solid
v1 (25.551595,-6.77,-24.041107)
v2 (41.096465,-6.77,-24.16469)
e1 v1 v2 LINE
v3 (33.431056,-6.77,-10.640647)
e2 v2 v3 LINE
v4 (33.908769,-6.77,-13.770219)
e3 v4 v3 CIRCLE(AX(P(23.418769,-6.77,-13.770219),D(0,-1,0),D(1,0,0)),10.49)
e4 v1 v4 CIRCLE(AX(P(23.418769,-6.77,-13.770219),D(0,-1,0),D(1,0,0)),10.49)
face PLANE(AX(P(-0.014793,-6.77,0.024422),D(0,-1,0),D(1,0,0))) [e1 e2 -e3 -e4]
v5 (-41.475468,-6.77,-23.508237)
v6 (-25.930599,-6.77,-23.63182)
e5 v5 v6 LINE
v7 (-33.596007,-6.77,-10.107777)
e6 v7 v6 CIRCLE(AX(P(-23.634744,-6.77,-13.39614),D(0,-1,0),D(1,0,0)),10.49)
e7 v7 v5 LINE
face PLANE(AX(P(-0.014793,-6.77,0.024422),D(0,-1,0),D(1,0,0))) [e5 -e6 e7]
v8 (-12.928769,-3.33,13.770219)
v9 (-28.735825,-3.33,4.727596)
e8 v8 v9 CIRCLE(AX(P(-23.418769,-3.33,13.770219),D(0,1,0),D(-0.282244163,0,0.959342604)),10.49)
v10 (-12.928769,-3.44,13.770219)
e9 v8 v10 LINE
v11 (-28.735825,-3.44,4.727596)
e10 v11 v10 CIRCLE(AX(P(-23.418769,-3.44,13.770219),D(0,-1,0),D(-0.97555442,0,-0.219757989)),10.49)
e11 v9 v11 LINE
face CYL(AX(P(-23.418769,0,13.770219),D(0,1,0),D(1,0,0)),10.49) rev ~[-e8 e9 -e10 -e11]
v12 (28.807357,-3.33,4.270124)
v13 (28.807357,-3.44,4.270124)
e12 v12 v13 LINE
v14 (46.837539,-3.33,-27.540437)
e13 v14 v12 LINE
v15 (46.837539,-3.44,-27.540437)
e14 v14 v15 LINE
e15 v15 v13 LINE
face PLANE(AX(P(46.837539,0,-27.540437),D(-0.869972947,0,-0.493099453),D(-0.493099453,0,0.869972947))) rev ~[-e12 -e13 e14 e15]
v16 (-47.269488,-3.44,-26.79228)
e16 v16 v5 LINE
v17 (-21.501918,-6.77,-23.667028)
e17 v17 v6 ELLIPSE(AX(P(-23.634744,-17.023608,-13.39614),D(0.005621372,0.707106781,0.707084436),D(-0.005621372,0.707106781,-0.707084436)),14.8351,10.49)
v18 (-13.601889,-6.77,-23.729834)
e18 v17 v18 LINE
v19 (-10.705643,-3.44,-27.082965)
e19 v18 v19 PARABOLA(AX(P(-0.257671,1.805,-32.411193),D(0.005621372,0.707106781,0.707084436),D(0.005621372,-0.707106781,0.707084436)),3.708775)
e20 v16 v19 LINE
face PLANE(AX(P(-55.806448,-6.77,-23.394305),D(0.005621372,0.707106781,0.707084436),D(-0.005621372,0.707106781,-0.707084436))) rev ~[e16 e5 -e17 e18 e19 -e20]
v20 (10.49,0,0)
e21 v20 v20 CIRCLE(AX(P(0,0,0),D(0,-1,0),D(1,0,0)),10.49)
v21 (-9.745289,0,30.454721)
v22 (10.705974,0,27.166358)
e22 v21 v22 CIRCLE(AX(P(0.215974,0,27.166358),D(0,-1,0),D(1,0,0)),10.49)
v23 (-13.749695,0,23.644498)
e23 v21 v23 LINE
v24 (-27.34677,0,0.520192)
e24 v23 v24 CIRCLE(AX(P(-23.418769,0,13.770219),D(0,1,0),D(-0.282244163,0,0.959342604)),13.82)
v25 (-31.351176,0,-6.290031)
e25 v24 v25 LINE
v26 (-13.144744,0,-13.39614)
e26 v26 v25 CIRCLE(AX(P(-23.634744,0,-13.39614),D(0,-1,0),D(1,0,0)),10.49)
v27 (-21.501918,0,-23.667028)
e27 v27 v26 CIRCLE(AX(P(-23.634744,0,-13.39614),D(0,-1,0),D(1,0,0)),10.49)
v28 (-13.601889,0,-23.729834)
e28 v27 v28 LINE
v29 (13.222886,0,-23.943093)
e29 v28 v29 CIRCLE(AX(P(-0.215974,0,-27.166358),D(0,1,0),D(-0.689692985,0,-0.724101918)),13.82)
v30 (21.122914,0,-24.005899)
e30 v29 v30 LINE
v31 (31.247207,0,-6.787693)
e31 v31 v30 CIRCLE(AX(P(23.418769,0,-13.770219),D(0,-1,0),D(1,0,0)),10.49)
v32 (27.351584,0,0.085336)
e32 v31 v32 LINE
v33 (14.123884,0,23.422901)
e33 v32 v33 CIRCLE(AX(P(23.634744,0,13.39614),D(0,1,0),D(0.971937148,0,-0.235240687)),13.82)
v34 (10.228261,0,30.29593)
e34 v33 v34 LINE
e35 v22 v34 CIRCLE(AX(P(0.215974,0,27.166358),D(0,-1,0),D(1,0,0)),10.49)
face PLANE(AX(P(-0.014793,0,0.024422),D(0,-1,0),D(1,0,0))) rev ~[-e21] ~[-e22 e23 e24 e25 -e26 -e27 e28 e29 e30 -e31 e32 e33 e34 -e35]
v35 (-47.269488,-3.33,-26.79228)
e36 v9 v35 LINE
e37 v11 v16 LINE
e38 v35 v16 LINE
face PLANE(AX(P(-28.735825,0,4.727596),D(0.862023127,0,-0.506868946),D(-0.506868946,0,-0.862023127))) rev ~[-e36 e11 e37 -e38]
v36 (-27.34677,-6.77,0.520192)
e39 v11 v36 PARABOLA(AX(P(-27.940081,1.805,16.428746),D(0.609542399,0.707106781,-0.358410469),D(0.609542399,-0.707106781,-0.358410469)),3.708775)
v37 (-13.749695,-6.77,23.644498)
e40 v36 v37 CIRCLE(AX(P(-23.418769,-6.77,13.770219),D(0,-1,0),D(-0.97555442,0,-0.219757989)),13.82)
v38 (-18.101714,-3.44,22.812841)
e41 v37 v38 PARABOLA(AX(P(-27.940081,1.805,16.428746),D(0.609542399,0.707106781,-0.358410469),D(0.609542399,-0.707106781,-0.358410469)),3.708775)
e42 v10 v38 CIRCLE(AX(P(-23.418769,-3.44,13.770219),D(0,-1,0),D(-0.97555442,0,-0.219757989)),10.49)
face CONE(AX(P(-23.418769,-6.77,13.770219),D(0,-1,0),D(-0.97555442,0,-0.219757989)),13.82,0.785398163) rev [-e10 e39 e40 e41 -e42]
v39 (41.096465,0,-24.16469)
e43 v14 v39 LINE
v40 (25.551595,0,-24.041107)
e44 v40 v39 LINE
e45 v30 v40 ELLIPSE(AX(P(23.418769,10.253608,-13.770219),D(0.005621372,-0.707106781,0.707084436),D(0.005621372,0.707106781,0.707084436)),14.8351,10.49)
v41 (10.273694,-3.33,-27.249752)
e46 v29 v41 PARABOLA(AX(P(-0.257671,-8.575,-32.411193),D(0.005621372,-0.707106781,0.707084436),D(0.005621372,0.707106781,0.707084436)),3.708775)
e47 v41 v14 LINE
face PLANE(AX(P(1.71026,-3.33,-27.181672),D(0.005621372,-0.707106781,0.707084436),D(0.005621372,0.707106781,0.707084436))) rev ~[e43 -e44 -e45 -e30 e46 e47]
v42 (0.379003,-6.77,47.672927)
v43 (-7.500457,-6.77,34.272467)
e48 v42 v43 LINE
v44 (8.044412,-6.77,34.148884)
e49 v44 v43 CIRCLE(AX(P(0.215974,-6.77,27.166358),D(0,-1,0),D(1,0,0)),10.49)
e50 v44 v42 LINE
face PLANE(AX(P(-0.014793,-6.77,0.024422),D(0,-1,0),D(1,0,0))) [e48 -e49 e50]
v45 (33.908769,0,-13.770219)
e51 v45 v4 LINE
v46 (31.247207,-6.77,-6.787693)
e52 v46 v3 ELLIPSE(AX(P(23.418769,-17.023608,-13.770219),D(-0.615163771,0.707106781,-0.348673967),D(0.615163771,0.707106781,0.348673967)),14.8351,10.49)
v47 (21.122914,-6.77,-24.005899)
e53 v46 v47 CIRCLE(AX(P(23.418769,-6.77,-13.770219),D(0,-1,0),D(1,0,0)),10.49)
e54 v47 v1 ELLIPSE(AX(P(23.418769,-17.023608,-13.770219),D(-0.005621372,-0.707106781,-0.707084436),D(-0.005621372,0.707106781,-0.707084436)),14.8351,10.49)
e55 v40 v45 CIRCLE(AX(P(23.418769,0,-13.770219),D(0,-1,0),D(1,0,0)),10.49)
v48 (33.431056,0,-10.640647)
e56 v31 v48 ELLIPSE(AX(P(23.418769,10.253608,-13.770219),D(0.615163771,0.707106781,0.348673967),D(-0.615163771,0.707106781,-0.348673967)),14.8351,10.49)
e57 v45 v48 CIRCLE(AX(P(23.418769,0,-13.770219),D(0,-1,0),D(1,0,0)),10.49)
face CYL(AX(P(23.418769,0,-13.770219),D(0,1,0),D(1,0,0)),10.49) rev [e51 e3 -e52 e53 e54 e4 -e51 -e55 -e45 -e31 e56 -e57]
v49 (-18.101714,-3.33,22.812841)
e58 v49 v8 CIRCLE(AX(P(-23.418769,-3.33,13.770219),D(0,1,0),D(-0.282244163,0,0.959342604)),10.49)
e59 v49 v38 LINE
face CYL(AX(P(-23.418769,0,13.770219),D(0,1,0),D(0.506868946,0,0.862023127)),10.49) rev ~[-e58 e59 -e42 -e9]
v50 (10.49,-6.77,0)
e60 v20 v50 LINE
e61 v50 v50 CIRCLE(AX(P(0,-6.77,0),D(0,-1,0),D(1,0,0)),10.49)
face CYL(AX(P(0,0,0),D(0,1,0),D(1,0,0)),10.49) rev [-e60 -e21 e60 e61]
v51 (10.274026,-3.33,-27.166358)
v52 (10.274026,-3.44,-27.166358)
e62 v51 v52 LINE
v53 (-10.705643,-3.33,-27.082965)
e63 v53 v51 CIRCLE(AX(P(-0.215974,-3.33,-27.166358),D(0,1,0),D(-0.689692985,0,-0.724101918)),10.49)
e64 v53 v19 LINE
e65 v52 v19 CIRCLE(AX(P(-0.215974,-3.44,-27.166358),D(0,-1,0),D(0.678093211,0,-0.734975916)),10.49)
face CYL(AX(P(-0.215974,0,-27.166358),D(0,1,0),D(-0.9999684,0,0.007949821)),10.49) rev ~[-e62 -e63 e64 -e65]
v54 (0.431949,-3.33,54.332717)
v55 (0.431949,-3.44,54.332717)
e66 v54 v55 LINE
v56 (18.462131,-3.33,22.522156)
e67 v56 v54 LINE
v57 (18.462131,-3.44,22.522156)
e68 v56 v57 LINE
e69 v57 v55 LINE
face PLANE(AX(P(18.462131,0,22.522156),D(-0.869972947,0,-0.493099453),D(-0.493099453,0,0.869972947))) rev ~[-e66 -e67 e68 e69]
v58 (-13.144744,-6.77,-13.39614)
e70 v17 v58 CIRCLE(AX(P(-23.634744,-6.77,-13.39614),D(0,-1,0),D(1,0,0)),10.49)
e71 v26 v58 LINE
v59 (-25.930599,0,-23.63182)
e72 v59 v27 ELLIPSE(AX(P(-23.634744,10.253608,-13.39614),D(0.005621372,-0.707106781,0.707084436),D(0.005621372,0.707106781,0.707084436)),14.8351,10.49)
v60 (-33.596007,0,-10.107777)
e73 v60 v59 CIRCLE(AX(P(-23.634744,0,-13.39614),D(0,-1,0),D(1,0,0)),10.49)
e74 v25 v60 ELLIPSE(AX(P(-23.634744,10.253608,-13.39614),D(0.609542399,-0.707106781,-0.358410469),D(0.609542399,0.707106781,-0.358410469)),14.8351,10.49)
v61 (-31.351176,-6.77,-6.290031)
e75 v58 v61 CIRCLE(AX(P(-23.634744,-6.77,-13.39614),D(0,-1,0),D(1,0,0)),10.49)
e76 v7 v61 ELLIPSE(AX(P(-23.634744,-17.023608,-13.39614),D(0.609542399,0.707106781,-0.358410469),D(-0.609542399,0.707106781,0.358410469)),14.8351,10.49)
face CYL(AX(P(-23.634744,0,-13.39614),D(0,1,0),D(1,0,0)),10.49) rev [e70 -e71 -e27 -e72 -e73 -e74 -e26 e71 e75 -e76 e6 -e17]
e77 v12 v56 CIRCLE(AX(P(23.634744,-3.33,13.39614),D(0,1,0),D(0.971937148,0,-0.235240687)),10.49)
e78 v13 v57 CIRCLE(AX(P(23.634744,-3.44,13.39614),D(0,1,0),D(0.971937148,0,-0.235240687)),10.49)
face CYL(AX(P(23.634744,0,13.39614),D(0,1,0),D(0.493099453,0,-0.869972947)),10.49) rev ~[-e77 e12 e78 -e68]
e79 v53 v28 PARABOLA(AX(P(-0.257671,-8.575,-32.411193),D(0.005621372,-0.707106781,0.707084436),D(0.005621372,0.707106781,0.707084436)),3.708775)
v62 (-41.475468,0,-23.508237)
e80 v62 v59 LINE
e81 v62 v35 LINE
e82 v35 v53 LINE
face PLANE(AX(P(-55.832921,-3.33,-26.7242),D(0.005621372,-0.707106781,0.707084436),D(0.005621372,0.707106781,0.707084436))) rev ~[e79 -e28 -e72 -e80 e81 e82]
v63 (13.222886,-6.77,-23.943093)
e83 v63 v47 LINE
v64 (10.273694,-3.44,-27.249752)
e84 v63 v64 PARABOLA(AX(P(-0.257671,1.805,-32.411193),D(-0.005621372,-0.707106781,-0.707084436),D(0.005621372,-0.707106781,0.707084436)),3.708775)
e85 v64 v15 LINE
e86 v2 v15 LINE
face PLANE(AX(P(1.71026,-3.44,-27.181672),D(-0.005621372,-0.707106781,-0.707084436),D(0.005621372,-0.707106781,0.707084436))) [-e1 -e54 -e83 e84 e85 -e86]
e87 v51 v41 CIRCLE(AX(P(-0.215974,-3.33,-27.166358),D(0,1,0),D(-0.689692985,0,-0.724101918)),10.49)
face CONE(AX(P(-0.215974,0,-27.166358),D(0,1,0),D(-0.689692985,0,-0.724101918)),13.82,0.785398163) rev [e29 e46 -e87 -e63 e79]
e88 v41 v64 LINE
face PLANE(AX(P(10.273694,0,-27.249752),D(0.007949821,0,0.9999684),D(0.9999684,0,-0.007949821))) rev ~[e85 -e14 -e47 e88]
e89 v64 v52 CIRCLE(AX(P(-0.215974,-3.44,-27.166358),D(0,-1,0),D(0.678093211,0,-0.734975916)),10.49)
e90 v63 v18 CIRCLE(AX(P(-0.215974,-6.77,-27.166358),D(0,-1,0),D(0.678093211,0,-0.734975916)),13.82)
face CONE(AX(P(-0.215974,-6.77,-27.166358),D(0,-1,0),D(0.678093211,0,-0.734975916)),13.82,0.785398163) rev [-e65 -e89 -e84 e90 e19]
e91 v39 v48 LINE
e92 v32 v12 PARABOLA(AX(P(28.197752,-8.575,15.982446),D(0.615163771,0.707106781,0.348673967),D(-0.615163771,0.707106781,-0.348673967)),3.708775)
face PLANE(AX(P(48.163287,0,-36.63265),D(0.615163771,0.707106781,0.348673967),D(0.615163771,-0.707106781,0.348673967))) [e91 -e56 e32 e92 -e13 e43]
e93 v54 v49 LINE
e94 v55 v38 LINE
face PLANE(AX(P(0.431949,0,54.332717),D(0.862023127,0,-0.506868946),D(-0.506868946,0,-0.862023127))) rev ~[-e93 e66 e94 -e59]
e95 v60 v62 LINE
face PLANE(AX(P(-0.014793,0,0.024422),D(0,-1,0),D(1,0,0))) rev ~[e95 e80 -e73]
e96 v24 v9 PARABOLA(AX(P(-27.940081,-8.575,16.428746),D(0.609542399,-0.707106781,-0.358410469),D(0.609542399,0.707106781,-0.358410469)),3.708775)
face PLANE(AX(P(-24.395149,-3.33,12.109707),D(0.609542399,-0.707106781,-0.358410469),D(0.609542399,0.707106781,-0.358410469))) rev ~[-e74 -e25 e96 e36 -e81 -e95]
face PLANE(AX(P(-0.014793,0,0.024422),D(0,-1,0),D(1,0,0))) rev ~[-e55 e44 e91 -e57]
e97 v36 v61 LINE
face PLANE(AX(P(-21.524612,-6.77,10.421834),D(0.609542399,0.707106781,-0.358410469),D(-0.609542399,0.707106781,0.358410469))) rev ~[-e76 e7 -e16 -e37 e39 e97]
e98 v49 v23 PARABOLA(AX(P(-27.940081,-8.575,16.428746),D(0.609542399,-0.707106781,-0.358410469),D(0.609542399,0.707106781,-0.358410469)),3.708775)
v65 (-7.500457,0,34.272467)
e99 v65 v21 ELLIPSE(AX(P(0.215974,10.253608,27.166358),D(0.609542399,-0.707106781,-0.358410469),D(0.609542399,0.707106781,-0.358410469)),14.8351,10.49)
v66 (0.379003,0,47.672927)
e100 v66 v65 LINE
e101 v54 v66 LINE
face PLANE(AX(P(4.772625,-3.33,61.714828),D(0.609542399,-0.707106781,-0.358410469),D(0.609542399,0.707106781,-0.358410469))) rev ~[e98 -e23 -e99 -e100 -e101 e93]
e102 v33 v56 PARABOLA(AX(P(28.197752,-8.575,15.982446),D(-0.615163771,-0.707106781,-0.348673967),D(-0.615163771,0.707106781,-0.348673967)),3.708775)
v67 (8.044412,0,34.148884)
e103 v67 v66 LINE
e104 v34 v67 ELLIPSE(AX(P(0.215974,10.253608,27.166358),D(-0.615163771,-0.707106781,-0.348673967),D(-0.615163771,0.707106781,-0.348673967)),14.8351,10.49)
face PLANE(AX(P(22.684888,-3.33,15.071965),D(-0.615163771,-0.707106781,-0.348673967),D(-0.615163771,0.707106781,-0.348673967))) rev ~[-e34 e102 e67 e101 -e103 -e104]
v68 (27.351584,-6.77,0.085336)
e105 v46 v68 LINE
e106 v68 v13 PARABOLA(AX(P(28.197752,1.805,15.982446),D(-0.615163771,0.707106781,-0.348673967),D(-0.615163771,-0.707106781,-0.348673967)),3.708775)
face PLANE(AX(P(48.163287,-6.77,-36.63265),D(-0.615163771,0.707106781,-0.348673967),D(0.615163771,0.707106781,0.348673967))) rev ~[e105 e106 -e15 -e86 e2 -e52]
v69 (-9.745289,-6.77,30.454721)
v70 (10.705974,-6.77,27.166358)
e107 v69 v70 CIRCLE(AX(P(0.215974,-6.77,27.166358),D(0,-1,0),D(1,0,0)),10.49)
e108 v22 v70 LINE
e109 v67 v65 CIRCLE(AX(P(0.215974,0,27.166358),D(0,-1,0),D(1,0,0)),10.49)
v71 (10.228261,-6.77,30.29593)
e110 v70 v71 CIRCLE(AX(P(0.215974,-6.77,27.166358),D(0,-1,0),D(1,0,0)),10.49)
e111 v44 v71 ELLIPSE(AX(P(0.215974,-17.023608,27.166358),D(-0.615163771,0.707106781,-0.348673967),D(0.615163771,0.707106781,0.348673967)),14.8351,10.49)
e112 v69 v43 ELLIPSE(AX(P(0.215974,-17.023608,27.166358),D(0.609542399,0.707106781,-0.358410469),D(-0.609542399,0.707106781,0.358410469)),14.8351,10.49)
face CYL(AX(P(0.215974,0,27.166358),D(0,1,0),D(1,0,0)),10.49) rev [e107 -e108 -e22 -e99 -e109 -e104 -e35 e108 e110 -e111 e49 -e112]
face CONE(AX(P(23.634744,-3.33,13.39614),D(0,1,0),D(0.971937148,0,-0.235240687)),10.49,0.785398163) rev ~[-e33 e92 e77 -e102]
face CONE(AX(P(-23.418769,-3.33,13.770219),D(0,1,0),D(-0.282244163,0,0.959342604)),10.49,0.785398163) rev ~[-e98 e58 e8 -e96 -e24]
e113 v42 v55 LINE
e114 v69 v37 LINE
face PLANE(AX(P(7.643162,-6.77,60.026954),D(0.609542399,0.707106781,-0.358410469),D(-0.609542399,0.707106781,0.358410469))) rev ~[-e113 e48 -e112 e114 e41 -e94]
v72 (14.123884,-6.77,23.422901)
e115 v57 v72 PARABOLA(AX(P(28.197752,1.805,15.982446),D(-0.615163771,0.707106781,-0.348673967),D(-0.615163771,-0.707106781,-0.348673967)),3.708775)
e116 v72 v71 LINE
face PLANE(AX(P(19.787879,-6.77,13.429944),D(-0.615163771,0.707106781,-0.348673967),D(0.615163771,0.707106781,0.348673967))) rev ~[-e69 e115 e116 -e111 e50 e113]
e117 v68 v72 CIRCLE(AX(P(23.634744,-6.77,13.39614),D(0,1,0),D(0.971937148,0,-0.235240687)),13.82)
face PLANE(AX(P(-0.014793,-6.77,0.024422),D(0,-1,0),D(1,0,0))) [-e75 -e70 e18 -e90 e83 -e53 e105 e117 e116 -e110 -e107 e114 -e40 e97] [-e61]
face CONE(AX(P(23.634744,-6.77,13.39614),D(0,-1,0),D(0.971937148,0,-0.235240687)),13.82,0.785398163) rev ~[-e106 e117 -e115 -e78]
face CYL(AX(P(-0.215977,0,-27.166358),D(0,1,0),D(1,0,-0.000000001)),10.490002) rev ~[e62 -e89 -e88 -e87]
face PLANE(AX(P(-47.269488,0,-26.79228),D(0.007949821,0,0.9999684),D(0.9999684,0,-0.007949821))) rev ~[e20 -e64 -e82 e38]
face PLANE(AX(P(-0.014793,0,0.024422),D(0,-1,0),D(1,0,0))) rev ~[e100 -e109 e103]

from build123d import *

# Parameters (mm, degrees)
F0_R         = 10.49
F1_DEPTH     = 6.77
F2_T1_DEPTH  = 53.6924086999
F2_T3_DEPTH  = 53.6924086999
F2_T5_DEPTH  = 53.6924086999
F2_T7_DEPTH  = 53.6924086999
F2_T9_DEPTH  = 53.6924086999
F2_T11_DEPTH = 53.6924086999
F2_T14_ANGLE = 273.6993702429
F2_T16_ANGLE = 273.6993702429
F2_T18_ANGLE = 273.6993702439
F2_T20_ANGLE = 273.6993702429
F2_T22_ANGLE = 273.6993702429
F2_T24_ANGLE = 273.6993702429


# Not quite as in the source:
# - a fillet or chamfer that OpenCascade refuses, or shapes differently, is made with other operations: its cross-section is extruded or revolved along the edge and cut away or added


with BuildPart() as f1:
    # F0 (on Front) → F1 (new body)
    with BuildSketch(Plane.XZ):
        with BuildLine():
            Line((18.4621305086, 22.5221560266), (0.4319489998, 54.3327168478))
            Line((0.4319489998, 54.3327168478), (-18.1017140256, 22.8128412157))
            ThreePointArc((-18.1017140256, 22.8128412157), (-14.313385988, 18.9790663983), (-12.9287692735, 13.7702186154))
            ThreePointArc((-12.9287692735, 13.7702186154), (-18.2099214906, 4.66483533), (-28.7358245213, 4.7275960151))
            Line((-28.7358245213, 4.7275960151), (-47.2694875467, -26.792279617))
            Line((-47.2694875467, -26.792279617), (-10.7056430125, -27.0829648061))
            ThreePointArc((-10.7056430125, -27.0829648061), (-0.1742773616, -16.6764412961), (10.2740255001, -27.1663584239))
            ThreePointArc((10.2740255001, -27.1663584239), (10.2739426279, -27.2080555622), (10.2736940127, -27.2497520417))
            Line((10.2736940127, -27.2497520417), (46.8375385469, -27.5404372308))
            Line((46.8375385469, -27.5404372308), (28.8073570381, 4.2701235904))
            ThreePointArc((28.8073570381, 4.2701235904), (14.5087275553, 8.2235265437), (18.4621305086, 22.5221560266))
        make_face()
        with Locations((-23.6347437733, -13.3961398085)):
            Circle(F0_R, mode=Mode.SUBTRACT)
        Circle(F0_R, mode=Mode.SUBTRACT)
        with Locations((23.4187692735, -13.7702186154)):
            Circle(F0_R, mode=Mode.SUBTRACT)
        with Locations((0.2159744999, 27.1663584239)):
            Circle(F0_R, mode=Mode.SUBTRACT)
    extrude(amount=F1_DEPTH)

    # F2: chamfer of 3.33 on 18 edges, made by hand

    # F2_s2 → F2_t1 (cut)
    with BuildSketch(Plane(origin=(-0.9763794466, 0, -1.6605113995), x_dir=(0, 1, 0), z_dir=(-0.5068689464, 0, -0.8620231268))):
        Polygon((-6.77, -23.8372169167), (-3.44, -27.1672169167), (-6.77, -27.1672169167), align=None)
        Polygon((-3.33, -27.1672169167), (0, -23.8372169167), (0, -27.1672169167), align=None)
    extrude(amount=F2_T1_DEPTH, mode=Mode.SUBTRACT)

    # F2_s4 → F2_t3 (cut)
    with BuildSketch(Plane(origin=(28.1913940744, 0, 47.9446094332), x_dir=(0, 1, 0), z_dir=(-0.5068689464, 0, -0.8620231268))):
        Polygon((-6.77, -23.8372169167), (-3.44, -27.1672169167), (-6.77, -27.1672169167), align=None)
        Polygon((-3.33, -27.1672169167), (0, -23.8372169167), (0, -27.1672169167), align=None)
    extrude(amount=F2_T3_DEPTH, mode=Mode.SUBTRACT)

    # F2_s6 → F2_t5 (cut)
    with BuildSketch(Plane(origin=(-0.9498553319, 0, 1.6758251042), x_dir=(0, 1, 0), z_dir=(-0.4930994533, 0, 0.8699729474))):
        Polygon((-6.77, -23.8372169167), (-3.44, -27.1672169167), (-6.77, -27.1672169167), align=None)
        Polygon((-3.33, -27.1672169167), (0, -23.8372169167), (0, -27.1672169167), align=None)
    extrude(amount=F2_T5_DEPTH, mode=Mode.SUBTRACT)

    # F2_s8 → F2_t7 (cut)
    with BuildSketch(Plane(origin=(-55.6169467809, 0, 0.4421587199), x_dir=(0, 1, 0), z_dir=(0.9999683997, 0, -0.0079498206))):
        Polygon((-6.77, -23.8372169167), (-3.44, -27.1672169167), (-6.77, -27.1672169167), align=None)
        Polygon((-3.33, -27.1672169167), (0, -23.8372169167), (0, -27.1672169167), align=None)
    extrude(amount=F2_T7_DEPTH, mode=Mode.SUBTRACT)

    # F2_s10 → F2_t9 (cut)
    with BuildSketch(Plane(origin=(1.9262347785, 0, -0.0153137048), x_dir=(0, 1, 0), z_dir=(0.9999683997, 0, -0.0079498206))):
        Polygon((-3.44, -27.1672169167), (-6.77, -23.8372169167), (-6.77, -27.1672169167), align=None)
        Polygon((-3.33, -27.1672169167), (0, -23.8372169167), (0, -27.1672169167), align=None)
    extrude(amount=F2_T9_DEPTH, mode=Mode.SUBTRACT)

    # F2_s12 → F2_t11 (cut)
    with BuildSketch(Plane(origin=(27.4255527065, 0, -48.3867681532), x_dir=(0, 1, 0), z_dir=(-0.4930994533, 0, 0.8699729474))):
        Polygon((-6.77, -23.8372169167), (-3.44, -27.1672169167), (-6.77, -27.1672169167), align=None)
        Polygon((0, -23.8372169167), (-3.33, -27.1672169167), (0, -27.1672169167), align=None)
    extrude(amount=F2_T11_DEPTH, mode=Mode.SUBTRACT)

    # F2_s13 → F2_t14 (revolve, cut)
    with BuildSketch(Plane(origin=(-4.0831164566, 0, 18.1258589444), x_dir=(0, 1, 0), z_dir=(-0.2197579888, 0, 0.97555442))):
        Polygon((-6.77, 33.6401683275), (-3.44, 30.3101683275), (-6.77, 30.3101683275), align=None)
    revolve(axis=Axis((-23.4187692735, -6.77, 13.7702186154), (0, -1, 0)), revolution_arc=F2_T14_ANGLE, mode=Mode.SUBTRACT)

    # F2_s15 → F2_t16 (revolve, cut)
    with BuildSketch(Plane(origin=(4.3707858991, 0, 18.0586498137), x_dir=(0, 1, 0), z_dir=(0.2352406866, 0, 0.9719371479))):
        Polygon((-6.77, -33.6401683275), (-3.44, -30.3101683275), (-6.77, -30.3101683275), align=None)
    revolve(axis=Axis((23.6347437733, -6.77, 13.3961398085), (0, 1, 0)), revolution_arc=F2_T16_ANGLE, mode=Mode.SUBTRACT)

    # F2_s17 → F2_t18 (revolve, cut)
    with BuildSketch(Plane(origin=(-13.6558960829, 0, -12.59901205), x_dir=(0, 1, 0), z_dir=(-0.7349759161, 0, -0.678093211))):
        Polygon((-6.77, 33.6401683276), (-3.44, 30.3101683277), (-6.77, 30.3101683276), align=None)
    revolve(axis=Axis((-0.2159744998, -6.77, -27.1663584239), (0, -1, 0)), revolution_arc=F2_T18_ANGLE, mode=Mode.SUBTRACT)

    # F2_s19 → F2_t20 (revolve, cut)
    with BuildSketch(Plane(origin=(-17.8246424463, 0, -5.2441132837), x_dir=(0, 1, 0), z_dir=(-0.9593426042, 0, -0.2822441634))):
        Polygon((-3.33, -30.3101683275), (0, -33.6401683275), (0, -30.3101683275), align=None)
    revolve(axis=Axis((-23.4187692735, 0, 13.7702186154), (0, 1, 0)), revolution_arc=F2_T20_ANGLE, mode=Mode.SUBTRACT)

    # F2_s21 → F2_t22 (revolve, cut)
    with BuildSketch(Plane(origin=(13.4538565472, 0, -12.81453653), x_dir=(0, 1, 0), z_dir=(0.7241019176, 0, -0.6896929845))):
        Polygon((0, -33.6401683275), (-3.33, -30.3101683275), (0, -30.3101683275), align=None)
    revolve(axis=Axis((-0.2159744999, 0, -27.1663584239), (0, 1, 0)), revolution_arc=F2_T22_ANGLE, mode=Mode.SUBTRACT)

    # F2_s23 → F2_t24 (revolve, cut)
    with BuildSketch(Plane(origin=(4.3707858991, 0, 18.0586498137), x_dir=(0, 1, 0), z_dir=(0.2352406866, 0, 0.9719371479))):
        Polygon((-3.33, -30.3101683275), (0, -33.6401683275), (0, -30.3101683275), align=None)
    revolve(axis=Axis((23.6347437733, 0, 13.3961398085), (0, 1, 0)), revolution_arc=F2_T24_ANGLE, mode=Mode.SUBTRACT)


solid = f1.part
